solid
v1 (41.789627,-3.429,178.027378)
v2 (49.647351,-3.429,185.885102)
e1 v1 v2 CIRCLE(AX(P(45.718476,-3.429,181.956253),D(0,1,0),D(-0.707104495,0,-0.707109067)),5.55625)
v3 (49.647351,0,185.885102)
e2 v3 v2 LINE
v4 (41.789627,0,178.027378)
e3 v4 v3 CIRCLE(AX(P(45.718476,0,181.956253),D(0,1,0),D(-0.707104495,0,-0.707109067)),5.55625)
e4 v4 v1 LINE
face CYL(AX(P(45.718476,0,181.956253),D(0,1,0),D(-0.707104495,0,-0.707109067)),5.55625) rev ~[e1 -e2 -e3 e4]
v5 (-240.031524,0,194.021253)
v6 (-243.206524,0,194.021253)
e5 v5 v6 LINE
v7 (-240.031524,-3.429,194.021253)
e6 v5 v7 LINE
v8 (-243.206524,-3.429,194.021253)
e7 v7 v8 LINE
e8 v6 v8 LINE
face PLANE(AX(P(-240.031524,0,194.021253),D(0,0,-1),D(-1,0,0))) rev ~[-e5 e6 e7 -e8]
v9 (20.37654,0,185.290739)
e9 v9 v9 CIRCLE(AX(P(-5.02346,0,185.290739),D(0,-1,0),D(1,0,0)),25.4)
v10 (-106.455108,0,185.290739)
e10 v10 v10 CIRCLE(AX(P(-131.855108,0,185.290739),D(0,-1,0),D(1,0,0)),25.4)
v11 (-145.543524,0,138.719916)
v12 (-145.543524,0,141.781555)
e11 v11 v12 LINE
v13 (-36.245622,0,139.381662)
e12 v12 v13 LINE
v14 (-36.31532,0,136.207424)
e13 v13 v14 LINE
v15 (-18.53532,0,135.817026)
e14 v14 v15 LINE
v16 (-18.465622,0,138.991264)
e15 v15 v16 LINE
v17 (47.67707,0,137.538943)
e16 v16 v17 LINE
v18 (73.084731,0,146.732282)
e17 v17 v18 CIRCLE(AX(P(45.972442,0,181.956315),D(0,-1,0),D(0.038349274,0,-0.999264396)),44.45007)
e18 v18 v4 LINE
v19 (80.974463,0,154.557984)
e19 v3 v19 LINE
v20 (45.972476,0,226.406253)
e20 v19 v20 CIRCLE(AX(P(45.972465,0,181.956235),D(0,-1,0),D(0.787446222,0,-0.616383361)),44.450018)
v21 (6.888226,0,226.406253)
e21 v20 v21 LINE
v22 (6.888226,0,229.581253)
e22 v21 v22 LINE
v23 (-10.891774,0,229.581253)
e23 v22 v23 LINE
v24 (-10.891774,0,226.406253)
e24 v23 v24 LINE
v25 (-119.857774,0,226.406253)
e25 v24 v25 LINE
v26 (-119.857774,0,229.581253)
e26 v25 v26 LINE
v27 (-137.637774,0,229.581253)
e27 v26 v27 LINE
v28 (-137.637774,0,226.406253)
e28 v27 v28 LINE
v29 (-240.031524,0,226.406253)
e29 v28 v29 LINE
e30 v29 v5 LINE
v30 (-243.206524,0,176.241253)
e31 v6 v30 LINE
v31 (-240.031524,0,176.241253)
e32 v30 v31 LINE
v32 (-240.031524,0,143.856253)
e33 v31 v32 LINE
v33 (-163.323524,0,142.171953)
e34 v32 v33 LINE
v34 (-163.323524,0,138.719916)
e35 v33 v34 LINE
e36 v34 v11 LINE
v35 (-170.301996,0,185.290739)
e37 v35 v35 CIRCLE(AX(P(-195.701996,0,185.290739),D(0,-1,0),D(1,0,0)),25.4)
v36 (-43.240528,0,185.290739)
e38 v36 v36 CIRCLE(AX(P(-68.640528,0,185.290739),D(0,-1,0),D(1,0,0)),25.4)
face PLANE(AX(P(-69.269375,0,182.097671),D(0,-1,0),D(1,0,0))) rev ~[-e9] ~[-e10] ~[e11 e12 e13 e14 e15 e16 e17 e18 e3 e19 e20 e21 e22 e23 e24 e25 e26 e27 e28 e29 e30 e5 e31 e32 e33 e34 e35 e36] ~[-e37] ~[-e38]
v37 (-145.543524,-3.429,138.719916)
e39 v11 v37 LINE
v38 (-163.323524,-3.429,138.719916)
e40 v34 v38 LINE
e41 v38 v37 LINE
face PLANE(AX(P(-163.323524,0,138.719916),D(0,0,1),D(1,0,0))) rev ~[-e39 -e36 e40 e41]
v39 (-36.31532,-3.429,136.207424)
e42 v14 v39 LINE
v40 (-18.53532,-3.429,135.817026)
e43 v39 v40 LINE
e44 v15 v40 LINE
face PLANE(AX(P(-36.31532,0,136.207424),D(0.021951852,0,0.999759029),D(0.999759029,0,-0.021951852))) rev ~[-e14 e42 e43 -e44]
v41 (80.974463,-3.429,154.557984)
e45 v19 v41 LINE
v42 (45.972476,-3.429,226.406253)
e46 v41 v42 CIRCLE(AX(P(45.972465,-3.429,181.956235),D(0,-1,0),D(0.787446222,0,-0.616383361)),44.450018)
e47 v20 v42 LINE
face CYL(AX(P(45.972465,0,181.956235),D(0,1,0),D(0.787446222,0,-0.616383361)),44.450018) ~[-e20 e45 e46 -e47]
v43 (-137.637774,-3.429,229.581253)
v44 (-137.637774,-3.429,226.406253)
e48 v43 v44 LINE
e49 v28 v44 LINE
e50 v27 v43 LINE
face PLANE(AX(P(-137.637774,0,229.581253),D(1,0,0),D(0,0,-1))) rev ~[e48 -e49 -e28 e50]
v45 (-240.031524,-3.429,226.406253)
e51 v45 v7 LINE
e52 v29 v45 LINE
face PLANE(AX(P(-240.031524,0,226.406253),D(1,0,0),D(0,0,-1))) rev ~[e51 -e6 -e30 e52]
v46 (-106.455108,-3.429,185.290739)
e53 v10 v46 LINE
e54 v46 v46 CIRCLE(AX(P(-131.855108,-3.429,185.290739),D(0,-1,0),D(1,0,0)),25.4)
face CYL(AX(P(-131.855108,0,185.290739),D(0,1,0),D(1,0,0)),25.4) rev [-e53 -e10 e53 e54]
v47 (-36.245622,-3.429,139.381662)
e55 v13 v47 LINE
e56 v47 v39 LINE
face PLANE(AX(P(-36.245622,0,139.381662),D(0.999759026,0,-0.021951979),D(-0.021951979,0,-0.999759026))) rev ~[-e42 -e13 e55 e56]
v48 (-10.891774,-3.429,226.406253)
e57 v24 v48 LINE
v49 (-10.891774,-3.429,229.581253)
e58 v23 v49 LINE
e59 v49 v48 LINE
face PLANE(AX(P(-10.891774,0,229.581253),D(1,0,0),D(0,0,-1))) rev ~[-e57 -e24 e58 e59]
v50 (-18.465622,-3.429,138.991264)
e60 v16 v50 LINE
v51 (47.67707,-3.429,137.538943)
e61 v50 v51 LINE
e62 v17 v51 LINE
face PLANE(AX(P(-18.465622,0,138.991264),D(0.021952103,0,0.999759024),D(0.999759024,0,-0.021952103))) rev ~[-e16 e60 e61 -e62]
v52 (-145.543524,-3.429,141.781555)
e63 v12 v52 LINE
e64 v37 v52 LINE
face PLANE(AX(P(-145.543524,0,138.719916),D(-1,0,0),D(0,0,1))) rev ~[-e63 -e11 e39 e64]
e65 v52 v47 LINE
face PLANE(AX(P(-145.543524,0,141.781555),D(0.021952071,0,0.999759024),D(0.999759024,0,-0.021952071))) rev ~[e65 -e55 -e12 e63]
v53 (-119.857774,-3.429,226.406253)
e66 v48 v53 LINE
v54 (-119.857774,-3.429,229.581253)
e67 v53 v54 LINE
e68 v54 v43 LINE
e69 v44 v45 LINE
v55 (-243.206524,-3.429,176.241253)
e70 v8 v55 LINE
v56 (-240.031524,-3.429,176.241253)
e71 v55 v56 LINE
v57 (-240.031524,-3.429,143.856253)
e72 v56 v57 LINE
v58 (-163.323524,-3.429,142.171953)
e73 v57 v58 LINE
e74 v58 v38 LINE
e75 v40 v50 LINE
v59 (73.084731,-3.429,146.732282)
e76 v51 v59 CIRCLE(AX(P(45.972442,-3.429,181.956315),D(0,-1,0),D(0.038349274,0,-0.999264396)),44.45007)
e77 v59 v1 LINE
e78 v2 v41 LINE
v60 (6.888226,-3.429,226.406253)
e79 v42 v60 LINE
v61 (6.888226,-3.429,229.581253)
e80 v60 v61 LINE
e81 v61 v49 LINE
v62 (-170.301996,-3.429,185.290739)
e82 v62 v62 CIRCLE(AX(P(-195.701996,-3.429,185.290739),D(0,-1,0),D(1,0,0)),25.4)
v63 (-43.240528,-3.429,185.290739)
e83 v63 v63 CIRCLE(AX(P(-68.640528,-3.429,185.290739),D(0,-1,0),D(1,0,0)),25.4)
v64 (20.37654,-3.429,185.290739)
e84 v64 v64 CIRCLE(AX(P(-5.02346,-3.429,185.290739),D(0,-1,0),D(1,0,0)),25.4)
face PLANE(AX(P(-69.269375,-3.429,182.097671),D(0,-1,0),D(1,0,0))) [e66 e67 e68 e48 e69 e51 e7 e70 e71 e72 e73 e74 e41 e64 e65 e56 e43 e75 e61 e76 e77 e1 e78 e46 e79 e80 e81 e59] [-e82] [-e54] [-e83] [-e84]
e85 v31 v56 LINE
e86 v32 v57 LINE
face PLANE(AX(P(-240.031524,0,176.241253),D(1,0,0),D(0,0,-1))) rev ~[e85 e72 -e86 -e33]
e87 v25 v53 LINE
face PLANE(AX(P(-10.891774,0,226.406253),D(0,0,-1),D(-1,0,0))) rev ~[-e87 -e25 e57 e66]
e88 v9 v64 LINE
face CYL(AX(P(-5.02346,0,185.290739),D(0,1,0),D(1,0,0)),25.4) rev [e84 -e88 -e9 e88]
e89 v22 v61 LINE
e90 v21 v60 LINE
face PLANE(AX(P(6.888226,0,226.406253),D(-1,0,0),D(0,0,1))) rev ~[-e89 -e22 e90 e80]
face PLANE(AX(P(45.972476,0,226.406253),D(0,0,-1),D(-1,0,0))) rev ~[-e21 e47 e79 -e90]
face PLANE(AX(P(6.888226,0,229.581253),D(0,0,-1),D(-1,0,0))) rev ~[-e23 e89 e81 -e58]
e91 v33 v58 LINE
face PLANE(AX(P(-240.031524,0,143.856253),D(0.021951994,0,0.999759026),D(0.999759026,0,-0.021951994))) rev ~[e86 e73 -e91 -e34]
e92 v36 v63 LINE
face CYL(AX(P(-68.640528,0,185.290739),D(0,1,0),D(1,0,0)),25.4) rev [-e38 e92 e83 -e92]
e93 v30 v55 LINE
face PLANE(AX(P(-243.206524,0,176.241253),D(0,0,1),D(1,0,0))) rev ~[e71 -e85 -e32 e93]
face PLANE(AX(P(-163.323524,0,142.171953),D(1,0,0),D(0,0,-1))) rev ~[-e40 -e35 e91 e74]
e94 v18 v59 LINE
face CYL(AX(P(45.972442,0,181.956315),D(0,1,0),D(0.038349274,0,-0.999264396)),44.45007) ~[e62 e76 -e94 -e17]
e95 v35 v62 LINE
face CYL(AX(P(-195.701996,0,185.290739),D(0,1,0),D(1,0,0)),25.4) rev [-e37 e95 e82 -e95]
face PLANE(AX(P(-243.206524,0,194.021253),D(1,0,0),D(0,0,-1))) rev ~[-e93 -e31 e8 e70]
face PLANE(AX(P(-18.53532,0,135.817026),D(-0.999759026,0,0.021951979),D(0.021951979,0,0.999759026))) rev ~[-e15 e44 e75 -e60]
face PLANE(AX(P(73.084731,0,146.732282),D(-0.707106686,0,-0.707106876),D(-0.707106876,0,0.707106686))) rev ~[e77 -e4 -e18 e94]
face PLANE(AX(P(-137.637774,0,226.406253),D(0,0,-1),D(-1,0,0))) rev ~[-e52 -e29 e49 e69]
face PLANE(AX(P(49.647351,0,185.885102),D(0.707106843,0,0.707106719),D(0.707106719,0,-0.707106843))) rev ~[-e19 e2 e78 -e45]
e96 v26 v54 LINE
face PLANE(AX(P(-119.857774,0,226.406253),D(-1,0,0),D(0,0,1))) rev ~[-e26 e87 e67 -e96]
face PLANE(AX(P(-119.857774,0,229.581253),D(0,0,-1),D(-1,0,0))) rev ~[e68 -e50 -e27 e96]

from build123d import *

# Parameters (mm, degrees)
F0_R     = 25.4
F1_DEPTH = 3.429


# Not quite as in the source:
# - ends of sketch curves that miss each other by under 0.0002 mm in the source are joined


with BuildPart() as f1:
    # F0 (on Front) → F1 (new body)
    with BuildSketch(Plane.XZ):
        with BuildLine():
            ThreePointArc((41.7896266471, 178.027378047), (41.789613947, 185.885114853), (49.647350753, 185.8851021529))
            Line((49.647350753, 185.8851021529), (80.9744634, 154.557984))
            ThreePointArc((80.9744634, 154.557984), (85.932800118, 201.4235329487), (45.972476, 226.4062528))
            Line((45.972476, 226.4062528), (6.888226, 226.4062528))
            Line((6.888226, 226.4062528), (6.888226, 229.5812528))
            Line((6.888226, 229.5812528), (-10.891774, 229.5812528))
            Line((-10.891774, 229.5812528), (-10.891774, 226.4062528))
            Line((-10.891774, 226.4062528), (-119.857774, 226.4062528))
            Line((-119.857774, 226.4062528), (-119.857774, 229.5812528))
            Line((-119.857774, 229.5812528), (-137.637774, 229.5812528))
            Line((-137.637774, 229.5812528), (-137.637774, 226.4062528))
            Line((-137.637774, 226.4062528), (-240.031524, 226.4062528))
            Line((-240.031524, 226.4062528), (-240.031524, 194.0212528))
            Line((-240.031524, 194.0212528), (-243.206524, 194.0212528))
            Line((-243.206524, 194.0212528), (-243.206524, 176.2412528))
            Line((-243.206524, 176.2412528), (-240.031524, 176.2412528))
            Line((-240.031524, 176.2412528), (-240.031524, 143.8562528))
            Line((-240.031524, 143.8562528), (-163.323524, 142.1719534))
            Line((-163.323524, 142.1719534), (-163.323524, 138.7199156))
            Line((-163.323524, 138.7199156), (-145.543524, 138.7199156))
            Line((-145.543524, 138.7199156), (-145.543524, 141.7815554))
            Line((-145.543524, 141.7815554), (-36.2456222, 139.3816618))
            Line((-36.2456222, 139.3816618), (-36.3153198, 136.2074238))
            Line((-36.3153198, 136.2074238), (-18.5353198, 135.8170258))
            Line((-18.5353198, 135.8170258), (-18.4656222, 138.9912638))
            Line((-18.4656222, 138.9912638), (47.67707, 137.5389426))
            ThreePointArc((47.67707, 137.5389426), (61.0963656021, 140.1582808001), (73.0847311317, 146.7322819609))
            Line((73.0847311317, 146.7322819609), (41.7896266471, 178.027378047))
        make_face()
        with Locations((-195.7019962, 185.2907394)):
            Circle(F0_R, mode=Mode.SUBTRACT)
        with Locations((-131.8551084, 185.2907394)):
            Circle(F0_R, mode=Mode.SUBTRACT)
        with Locations((-68.6405282, 185.2907394)):
            Circle(F0_R, mode=Mode.SUBTRACT)
        with Locations((-5.0234596, 185.2907394)):
            Circle(F0_R, mode=Mode.SUBTRACT)
    extrude(amount=F1_DEPTH)


solid = f1.part
